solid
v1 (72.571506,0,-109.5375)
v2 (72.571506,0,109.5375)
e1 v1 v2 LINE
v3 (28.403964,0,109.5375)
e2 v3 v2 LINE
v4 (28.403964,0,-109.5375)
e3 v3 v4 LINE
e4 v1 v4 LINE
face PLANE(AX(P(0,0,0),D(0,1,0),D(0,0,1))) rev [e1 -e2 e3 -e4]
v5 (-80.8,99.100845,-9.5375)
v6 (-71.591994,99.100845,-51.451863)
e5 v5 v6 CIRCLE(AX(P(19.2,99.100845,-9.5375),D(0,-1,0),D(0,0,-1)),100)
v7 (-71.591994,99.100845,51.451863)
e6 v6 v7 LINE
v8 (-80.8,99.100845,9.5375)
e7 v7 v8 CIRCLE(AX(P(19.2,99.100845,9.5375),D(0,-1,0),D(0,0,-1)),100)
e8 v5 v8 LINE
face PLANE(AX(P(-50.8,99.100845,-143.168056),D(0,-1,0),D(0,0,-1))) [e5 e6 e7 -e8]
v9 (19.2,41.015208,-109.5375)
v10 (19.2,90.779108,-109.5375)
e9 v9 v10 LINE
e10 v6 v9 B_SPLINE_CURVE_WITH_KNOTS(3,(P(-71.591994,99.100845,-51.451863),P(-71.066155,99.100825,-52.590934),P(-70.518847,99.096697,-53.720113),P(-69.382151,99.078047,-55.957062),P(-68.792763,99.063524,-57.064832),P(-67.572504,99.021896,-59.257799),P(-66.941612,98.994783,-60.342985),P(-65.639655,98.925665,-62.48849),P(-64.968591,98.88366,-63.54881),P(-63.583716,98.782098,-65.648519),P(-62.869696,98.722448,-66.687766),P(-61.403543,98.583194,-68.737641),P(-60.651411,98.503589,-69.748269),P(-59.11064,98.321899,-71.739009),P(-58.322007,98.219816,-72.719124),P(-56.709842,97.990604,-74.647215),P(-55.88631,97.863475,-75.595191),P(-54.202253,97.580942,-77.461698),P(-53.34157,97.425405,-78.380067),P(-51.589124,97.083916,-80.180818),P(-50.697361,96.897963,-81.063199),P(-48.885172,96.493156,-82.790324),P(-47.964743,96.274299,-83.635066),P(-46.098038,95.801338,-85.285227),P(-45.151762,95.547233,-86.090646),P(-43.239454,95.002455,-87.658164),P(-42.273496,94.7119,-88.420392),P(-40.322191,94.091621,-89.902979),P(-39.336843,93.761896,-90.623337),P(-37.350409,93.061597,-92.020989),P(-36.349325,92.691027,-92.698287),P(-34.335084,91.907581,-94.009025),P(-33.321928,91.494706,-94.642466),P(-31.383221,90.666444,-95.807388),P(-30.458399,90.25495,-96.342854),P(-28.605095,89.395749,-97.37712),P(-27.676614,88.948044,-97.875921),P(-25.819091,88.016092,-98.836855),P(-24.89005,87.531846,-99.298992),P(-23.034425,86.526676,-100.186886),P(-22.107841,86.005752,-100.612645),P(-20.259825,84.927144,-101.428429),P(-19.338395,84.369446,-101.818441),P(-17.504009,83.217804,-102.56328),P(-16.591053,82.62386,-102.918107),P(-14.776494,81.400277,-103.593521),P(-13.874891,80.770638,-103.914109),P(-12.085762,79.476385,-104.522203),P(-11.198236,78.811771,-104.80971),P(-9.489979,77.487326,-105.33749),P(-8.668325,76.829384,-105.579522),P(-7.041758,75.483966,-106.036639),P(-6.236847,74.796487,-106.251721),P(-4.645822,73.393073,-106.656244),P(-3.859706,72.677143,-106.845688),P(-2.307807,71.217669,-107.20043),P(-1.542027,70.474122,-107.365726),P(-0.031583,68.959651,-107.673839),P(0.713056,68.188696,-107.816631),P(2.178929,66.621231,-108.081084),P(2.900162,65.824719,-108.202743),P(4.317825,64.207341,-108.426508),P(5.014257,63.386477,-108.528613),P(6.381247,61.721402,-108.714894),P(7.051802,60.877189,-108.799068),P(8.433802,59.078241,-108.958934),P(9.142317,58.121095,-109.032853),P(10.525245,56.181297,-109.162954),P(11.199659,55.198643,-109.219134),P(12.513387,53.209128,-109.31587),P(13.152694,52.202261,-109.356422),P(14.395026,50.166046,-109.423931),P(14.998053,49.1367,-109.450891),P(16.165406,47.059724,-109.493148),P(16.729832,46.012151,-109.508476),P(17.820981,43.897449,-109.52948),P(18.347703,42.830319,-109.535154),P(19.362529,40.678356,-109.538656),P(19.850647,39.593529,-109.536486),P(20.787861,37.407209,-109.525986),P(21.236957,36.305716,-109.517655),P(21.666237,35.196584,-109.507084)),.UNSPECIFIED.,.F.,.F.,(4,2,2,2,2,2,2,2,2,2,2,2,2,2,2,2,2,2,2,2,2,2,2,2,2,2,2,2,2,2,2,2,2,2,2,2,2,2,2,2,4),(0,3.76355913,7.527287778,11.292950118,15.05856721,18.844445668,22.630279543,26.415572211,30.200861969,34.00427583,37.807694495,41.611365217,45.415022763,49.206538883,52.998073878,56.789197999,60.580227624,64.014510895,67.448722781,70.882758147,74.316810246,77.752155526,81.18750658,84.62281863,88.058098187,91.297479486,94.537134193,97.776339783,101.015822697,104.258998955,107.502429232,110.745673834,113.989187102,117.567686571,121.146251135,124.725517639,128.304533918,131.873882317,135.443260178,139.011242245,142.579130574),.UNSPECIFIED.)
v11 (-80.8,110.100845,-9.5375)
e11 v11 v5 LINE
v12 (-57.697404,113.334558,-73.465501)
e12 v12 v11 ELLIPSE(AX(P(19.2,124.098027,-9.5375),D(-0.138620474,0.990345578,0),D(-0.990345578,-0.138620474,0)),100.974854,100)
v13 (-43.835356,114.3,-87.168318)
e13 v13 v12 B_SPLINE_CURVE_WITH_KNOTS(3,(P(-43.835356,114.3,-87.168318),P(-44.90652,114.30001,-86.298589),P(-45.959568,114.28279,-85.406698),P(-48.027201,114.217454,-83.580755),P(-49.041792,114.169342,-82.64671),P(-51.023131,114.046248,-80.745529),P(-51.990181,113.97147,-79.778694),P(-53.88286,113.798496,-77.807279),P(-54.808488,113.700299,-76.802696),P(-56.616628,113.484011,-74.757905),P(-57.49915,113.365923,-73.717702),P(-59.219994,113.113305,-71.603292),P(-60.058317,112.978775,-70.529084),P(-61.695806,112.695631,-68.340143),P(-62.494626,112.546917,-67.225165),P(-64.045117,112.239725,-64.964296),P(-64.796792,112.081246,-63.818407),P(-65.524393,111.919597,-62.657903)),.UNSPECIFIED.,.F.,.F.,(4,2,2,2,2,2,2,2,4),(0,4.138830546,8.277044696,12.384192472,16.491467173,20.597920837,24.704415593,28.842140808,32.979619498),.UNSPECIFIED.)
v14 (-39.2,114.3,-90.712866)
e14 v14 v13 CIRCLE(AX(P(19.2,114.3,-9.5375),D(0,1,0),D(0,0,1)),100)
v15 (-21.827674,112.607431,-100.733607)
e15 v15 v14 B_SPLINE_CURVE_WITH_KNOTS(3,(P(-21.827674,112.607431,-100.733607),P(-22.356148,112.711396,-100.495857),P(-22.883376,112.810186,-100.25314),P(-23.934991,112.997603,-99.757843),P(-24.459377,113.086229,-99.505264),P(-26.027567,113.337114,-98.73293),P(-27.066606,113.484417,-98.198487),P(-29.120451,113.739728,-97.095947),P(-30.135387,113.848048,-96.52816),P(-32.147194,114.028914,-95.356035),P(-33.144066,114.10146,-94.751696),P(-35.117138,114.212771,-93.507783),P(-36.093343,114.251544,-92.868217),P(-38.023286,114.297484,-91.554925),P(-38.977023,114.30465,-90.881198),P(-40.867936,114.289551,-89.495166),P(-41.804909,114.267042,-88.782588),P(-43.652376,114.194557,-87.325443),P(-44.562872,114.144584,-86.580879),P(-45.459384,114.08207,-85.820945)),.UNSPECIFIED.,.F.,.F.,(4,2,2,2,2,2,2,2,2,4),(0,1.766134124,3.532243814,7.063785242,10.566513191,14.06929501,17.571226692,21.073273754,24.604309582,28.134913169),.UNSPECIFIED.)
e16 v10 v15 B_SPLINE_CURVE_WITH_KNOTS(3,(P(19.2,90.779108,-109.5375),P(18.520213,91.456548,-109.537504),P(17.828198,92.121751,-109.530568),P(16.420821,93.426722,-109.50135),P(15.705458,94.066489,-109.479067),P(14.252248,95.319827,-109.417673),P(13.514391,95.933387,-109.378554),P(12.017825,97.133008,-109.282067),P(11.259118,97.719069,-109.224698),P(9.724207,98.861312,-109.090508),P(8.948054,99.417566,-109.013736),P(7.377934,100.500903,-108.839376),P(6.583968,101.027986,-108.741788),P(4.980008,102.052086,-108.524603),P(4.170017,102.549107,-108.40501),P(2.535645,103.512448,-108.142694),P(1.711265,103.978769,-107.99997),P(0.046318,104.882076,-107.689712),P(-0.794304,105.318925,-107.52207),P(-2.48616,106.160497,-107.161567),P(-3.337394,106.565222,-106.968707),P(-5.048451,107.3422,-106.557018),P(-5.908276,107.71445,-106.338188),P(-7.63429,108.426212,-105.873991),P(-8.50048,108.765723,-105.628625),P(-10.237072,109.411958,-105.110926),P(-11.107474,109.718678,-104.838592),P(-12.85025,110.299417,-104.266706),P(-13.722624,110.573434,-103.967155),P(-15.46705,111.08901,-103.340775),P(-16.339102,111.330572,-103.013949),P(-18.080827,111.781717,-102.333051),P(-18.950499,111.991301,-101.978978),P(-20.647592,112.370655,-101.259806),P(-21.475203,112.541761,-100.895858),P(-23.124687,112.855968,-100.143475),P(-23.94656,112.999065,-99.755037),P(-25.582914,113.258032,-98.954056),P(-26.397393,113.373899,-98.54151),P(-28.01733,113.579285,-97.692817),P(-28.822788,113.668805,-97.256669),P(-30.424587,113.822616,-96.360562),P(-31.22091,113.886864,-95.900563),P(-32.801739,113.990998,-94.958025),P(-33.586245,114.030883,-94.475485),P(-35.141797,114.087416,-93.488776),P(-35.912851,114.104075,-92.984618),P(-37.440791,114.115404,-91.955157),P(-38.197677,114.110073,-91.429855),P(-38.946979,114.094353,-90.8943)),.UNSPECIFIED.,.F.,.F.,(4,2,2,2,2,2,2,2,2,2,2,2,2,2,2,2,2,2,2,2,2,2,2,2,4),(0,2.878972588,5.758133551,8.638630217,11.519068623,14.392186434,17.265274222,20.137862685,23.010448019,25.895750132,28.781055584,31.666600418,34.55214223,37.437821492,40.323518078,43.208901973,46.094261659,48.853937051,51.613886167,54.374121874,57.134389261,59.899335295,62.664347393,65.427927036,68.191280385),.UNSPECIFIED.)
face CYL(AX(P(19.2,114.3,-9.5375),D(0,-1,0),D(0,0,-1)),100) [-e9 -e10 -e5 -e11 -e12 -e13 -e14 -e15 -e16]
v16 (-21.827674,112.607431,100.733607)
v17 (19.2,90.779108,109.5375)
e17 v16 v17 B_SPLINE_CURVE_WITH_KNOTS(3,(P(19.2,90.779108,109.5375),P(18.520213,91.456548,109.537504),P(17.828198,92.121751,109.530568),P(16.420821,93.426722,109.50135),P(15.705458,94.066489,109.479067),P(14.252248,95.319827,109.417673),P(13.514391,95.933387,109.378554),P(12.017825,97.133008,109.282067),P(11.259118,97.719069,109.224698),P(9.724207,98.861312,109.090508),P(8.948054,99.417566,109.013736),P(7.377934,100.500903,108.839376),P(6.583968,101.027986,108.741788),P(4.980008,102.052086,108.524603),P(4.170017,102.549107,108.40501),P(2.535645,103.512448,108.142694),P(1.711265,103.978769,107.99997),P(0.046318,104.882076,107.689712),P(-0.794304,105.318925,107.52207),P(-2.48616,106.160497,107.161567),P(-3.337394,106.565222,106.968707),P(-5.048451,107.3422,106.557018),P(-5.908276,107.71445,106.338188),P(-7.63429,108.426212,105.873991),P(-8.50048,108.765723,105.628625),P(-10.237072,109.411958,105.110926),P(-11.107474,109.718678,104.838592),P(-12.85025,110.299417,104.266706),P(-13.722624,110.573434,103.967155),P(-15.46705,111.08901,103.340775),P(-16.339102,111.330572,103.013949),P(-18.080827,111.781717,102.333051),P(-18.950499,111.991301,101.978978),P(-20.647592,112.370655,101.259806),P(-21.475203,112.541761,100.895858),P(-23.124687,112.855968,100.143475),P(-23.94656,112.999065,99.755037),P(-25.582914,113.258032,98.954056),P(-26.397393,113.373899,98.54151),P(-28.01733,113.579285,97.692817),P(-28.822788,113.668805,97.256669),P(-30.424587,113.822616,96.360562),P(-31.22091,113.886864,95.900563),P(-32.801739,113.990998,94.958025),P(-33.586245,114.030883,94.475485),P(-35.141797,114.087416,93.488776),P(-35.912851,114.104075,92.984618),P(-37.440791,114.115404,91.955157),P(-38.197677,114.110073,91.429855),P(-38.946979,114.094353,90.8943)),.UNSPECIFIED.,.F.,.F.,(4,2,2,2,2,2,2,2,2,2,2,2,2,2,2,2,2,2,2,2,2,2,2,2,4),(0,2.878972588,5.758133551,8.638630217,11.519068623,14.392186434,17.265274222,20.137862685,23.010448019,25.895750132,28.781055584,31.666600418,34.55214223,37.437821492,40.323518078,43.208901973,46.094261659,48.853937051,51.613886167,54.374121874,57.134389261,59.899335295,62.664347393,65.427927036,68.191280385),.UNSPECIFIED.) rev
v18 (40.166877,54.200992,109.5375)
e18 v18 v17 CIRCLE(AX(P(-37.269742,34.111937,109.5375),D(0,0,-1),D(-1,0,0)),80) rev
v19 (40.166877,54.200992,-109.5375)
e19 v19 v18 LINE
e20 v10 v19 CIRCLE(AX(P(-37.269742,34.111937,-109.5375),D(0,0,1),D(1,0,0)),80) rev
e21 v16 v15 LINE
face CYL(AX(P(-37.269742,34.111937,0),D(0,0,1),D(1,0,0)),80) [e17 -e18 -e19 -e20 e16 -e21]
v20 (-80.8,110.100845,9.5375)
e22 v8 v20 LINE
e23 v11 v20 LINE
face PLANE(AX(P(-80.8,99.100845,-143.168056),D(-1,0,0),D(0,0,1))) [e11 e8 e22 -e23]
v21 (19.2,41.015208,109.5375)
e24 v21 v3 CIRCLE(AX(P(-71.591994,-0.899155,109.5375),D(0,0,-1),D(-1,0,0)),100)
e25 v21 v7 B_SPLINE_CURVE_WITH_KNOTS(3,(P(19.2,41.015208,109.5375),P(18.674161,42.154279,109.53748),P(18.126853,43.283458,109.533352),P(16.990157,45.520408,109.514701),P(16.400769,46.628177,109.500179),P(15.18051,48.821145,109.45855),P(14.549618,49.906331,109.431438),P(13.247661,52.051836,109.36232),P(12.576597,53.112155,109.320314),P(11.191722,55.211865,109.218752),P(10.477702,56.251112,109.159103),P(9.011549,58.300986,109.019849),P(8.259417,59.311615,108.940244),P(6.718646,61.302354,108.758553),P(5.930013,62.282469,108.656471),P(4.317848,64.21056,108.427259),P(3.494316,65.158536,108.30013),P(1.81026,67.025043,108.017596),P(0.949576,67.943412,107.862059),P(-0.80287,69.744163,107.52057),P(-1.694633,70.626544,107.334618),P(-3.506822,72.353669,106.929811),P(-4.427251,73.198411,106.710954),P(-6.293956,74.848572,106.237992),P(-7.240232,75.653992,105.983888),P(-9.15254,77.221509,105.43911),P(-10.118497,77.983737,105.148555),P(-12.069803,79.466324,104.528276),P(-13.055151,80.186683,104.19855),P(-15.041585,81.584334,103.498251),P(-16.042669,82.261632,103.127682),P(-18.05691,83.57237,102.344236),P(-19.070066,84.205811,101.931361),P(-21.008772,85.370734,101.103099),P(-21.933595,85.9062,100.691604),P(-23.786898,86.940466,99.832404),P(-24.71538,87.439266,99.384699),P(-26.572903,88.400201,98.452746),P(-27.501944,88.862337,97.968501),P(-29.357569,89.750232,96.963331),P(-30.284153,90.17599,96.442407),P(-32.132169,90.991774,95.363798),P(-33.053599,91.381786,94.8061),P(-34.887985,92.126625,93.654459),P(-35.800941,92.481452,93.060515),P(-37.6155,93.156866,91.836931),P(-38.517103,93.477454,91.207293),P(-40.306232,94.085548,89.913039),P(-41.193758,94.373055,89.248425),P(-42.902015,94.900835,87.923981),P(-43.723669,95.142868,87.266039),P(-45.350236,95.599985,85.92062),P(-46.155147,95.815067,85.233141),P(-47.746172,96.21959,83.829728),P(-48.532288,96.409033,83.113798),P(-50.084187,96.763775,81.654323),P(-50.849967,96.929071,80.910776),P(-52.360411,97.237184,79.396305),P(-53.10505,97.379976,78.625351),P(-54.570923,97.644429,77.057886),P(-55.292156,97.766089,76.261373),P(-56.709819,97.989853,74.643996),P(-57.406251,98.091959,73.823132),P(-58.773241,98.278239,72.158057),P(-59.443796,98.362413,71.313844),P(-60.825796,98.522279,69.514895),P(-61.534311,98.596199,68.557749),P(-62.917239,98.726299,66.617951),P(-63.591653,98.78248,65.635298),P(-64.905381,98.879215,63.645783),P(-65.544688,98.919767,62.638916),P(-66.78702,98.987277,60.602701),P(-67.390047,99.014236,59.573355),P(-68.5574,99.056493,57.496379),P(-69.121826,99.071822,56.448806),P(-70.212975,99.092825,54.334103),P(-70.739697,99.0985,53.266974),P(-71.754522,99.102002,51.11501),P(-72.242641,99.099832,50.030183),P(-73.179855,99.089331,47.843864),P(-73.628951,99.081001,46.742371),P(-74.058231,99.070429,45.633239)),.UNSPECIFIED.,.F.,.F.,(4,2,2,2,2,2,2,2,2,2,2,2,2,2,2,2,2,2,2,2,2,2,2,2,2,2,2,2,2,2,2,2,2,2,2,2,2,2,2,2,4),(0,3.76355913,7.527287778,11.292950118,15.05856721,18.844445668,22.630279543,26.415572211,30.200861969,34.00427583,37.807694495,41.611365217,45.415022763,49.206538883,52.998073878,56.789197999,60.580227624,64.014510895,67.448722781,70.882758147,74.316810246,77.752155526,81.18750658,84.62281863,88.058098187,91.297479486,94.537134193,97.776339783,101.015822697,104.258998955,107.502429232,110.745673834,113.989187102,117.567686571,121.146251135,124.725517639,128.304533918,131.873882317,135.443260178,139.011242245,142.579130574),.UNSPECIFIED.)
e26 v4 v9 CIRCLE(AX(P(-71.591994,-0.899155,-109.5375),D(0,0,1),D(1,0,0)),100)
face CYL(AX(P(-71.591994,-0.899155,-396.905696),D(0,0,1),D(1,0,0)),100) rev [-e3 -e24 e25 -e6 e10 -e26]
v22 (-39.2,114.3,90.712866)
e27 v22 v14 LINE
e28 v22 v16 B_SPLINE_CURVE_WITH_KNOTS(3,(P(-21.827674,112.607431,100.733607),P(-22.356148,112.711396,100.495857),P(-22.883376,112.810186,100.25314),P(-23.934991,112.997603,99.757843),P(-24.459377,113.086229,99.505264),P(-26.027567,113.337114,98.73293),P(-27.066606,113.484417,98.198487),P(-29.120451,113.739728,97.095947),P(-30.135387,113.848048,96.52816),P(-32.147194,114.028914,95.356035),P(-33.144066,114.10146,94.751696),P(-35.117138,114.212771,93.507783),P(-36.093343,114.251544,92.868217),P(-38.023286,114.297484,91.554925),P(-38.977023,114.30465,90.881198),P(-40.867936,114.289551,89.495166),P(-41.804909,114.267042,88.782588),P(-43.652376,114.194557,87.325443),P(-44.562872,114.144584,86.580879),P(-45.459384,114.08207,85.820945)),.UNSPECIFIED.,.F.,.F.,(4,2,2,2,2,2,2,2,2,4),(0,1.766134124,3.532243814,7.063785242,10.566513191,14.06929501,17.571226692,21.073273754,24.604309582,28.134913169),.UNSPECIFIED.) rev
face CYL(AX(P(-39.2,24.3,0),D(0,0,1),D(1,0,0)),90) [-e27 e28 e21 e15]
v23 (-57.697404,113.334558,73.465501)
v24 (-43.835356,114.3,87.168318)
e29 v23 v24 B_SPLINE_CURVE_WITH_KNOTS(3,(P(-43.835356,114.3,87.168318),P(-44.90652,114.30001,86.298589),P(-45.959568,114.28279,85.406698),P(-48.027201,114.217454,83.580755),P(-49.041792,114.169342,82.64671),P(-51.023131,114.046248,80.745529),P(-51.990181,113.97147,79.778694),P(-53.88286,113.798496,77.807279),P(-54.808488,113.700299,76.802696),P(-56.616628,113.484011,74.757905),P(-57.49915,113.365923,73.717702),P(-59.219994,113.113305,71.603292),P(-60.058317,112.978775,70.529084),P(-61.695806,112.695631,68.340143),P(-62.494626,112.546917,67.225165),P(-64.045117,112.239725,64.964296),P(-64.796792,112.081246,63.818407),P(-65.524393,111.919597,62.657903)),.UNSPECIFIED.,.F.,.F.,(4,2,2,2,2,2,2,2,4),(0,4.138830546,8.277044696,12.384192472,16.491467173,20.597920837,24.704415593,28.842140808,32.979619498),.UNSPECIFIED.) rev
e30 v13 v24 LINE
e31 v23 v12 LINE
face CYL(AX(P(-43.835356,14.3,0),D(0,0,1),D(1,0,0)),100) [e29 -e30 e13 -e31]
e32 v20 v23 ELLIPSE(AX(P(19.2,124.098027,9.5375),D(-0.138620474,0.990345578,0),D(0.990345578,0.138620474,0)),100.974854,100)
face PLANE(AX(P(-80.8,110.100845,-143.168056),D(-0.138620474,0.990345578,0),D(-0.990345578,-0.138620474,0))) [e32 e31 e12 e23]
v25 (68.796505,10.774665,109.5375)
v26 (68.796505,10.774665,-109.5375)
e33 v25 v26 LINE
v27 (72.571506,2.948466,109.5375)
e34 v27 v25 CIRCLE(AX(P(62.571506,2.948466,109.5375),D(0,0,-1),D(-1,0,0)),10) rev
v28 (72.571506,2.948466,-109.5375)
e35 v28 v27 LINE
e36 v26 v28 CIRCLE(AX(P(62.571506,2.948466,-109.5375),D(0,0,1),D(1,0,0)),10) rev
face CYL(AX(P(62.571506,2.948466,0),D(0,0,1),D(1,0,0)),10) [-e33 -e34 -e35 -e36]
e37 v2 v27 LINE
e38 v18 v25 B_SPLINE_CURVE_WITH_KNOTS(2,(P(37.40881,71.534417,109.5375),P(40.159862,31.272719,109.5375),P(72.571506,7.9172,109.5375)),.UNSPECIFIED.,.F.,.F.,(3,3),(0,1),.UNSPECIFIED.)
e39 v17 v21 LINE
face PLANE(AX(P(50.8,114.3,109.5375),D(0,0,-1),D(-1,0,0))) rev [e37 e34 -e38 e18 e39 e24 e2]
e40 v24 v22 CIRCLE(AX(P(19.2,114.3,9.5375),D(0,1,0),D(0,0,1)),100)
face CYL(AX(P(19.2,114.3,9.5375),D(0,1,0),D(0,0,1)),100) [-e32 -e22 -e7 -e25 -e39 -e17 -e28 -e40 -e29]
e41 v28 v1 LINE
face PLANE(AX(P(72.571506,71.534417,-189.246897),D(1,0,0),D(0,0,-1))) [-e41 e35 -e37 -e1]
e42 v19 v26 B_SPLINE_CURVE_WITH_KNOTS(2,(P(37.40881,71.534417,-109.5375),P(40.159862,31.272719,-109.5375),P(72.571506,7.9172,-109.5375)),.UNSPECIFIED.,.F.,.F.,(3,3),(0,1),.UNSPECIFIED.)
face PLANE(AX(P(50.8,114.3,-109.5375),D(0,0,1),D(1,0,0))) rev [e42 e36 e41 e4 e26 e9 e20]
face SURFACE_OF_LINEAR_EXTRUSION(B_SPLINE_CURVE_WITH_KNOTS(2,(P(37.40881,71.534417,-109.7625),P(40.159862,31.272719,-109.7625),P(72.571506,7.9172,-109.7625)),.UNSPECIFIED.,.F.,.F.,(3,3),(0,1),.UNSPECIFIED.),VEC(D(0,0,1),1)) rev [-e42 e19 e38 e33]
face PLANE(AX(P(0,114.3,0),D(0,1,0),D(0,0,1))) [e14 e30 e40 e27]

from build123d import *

# Parameters (mm, degrees)
SKETCH1_W           = 101.6
SKETCH1_H           = 219.075
BOSS_EXTRUDE2_DEPTH = 114.3
SKETCH2_R           = 101.6
CUT_EXTRUDE1_DEPTH  = 219.075
FILLET1_R           = 90
SKETCH3_W           = 35.162695898
SKETCH3_H           = 71.534417327
BOSS_EXTRUDE3_DEPTH = 219.075
CUT_EXTRUDE2_DEPTH  = 219.3
FILLET2_R           = 80
FILLET3_R           = 10
BOSS_EXTRUDE5_DEPTH = 219.075
FILLET5_R           = 100
FILLET7_R           = 100
FILLET11_R          = 100
FILLET12_R          = 100


with BuildPart() as part:
    # Sketch1 → Boss-Extrude2 (new body)
    with BuildSketch(Plane(origin=(0, 0, 0), x_dir=(1, 0, 0), z_dir=(0, 1, 0))):
        Rectangle(SKETCH1_W, SKETCH1_H)
    extrude(amount=BOSS_EXTRUDE2_DEPTH)

    # Sketch2 → Cut-Extrude1 (cut)
    with BuildSketch(Plane.XY.offset(109.5375)):
        with Locations((-73.196036425, 0)):
            Circle(SKETCH2_R)
    extrude(amount=-CUT_EXTRUDE1_DEPTH, mode=Mode.SUBTRACT)

    # Fillet1
    fillet1_edges = [part.edges().sort_by_distance(p)[0] for p in [
        (50.8, 114.3, 0),
    ]]
    fillet(fillet1_edges, radius=FILLET1_R)

    # Sketch3 → Boss-Extrude3 (add)
    with BuildSketch(Plane.XY.offset(109.5375)):
        with Locations((54.990158277, 35.767208663)):
            Rectangle(SKETCH3_W, SKETCH3_H)
    extrude(amount=-BOSS_EXTRUDE3_DEPTH)

    # Sketch4 → Cut-Extrude2 (cut)
    with BuildSketch(Plane.XY.offset(109.5375)):
        with BuildLine():
            Line((37.408810328, 71.534417327), (72.571506226, 71.534417327))
            Line((72.571506226, 71.534417327), (72.571506226, 7.917200167))
            add(Edge.make_bspline(
                [(37.408810328, 71.534417327), (40.159862315, 31.272718553), (72.571506226, 7.917200167)],
                knots=[0, 0, 0, 1, 1, 1], degree=2))
        make_face()
    extrude(amount=-CUT_EXTRUDE2_DEPTH, mode=Mode.SUBTRACT)

    # Fillet2
    fillet2_edges = [part.edges().sort_by_distance(p)[0] for p in [
        (37.408810328, 71.534417327, 0),
    ]]
    fillet(fillet2_edges, radius=FILLET2_R)

    # Fillet3
    fillet3_edges = [part.edges().sort_by_distance(p)[0] for p in [
        (72.571506226, 7.917200167, 0),
    ]]
    fillet(fillet3_edges, radius=FILLET3_R)

    # Sketch5 → Boss-Extrude5 (add)
    with BuildSketch(Plane.XY.offset(109.5375)):
        Polygon((-80.8, 99.100845367), (-80.8, 110.100845367), (-50.8, 114.3), (-50.8, 99.100845367), align=None)
    extrude(amount=-BOSS_EXTRUDE5_DEPTH)

    # Fillet5
    # the kernel refuses this fillet: 100 mm, written as the material it adds along each edge
    with BuildSketch(Plane(origin=(-50.8, 99.100845367, -109.5375), x_dir=(0.6243262651126902, -0.7811636926345457, 0), z_dir=(0, 0, 1))) as fillet5_piece_1:
        with BuildLine():
            CenterArc((65.135381338, -78.674577281), FILLET5_R, 51.882430425, 89.484815402)
            Line((-12.980987926, -16.24195077), (-14.543315311, -14.99329824))
            Line((-14.543315311, -14.99329824), (-1.562327385, 1.24865253))
            Line((-1.562327385, 1.24865253), (-1.24865253, 1.562327385))
            ThreePointArc((-1.24865253, 1.562327385), (63.431548535, 24.233768828), (128.097651386, 1.573491546))
            Line((128.097651386, 1.573491546), (126.863097071, 0))
        make_face()
    extrude(amount=219.075)

    # Fillet7
    fillet7_edges = [part.edges().sort_by_distance(p)[0] for p in [
        (-50.8, 114.3, 0),
    ]]
    fillet(fillet7_edges, radius=FILLET7_R)

    # Fillet11
    # the kernel refuses this fillet: 100 mm, written as the material it takes off along each edge
    with BuildSketch(Plane(origin=(-80.8, -150.899154633, -109.5375), x_dir=(1, 0, 0), z_dir=(0, 1, 0))) as fillet11_piece_1:
        with BuildLine():
            CenterArc((FILLET11_R, -FILLET11_R), FILLET11_R, 90, 90)
            Line((0, -FILLET11_R), (0, 0))
            Line((0, 0), (FILLET11_R, 0))
        make_face()
    extrude(amount=511, mode=Mode.SUBTRACT)

    # Fillet12
    # the kernel refuses this fillet: 100 mm, written as the material it takes off along each edge
    with BuildSketch(Plane(origin=(-80.8, -150.899154633, 109.5375), x_dir=(1, 0, 0), z_dir=(0, 1, 0))) as fillet12_piece_1:
        with BuildLine():
            CenterArc((FILLET12_R, FILLET12_R), FILLET12_R, 180, 90)
            Line((0, FILLET12_R), (0, 0))
            Line((0, 0), (FILLET12_R, 0))
        make_face()
    extrude(amount=511, mode=Mode.SUBTRACT)


solid = part.part
